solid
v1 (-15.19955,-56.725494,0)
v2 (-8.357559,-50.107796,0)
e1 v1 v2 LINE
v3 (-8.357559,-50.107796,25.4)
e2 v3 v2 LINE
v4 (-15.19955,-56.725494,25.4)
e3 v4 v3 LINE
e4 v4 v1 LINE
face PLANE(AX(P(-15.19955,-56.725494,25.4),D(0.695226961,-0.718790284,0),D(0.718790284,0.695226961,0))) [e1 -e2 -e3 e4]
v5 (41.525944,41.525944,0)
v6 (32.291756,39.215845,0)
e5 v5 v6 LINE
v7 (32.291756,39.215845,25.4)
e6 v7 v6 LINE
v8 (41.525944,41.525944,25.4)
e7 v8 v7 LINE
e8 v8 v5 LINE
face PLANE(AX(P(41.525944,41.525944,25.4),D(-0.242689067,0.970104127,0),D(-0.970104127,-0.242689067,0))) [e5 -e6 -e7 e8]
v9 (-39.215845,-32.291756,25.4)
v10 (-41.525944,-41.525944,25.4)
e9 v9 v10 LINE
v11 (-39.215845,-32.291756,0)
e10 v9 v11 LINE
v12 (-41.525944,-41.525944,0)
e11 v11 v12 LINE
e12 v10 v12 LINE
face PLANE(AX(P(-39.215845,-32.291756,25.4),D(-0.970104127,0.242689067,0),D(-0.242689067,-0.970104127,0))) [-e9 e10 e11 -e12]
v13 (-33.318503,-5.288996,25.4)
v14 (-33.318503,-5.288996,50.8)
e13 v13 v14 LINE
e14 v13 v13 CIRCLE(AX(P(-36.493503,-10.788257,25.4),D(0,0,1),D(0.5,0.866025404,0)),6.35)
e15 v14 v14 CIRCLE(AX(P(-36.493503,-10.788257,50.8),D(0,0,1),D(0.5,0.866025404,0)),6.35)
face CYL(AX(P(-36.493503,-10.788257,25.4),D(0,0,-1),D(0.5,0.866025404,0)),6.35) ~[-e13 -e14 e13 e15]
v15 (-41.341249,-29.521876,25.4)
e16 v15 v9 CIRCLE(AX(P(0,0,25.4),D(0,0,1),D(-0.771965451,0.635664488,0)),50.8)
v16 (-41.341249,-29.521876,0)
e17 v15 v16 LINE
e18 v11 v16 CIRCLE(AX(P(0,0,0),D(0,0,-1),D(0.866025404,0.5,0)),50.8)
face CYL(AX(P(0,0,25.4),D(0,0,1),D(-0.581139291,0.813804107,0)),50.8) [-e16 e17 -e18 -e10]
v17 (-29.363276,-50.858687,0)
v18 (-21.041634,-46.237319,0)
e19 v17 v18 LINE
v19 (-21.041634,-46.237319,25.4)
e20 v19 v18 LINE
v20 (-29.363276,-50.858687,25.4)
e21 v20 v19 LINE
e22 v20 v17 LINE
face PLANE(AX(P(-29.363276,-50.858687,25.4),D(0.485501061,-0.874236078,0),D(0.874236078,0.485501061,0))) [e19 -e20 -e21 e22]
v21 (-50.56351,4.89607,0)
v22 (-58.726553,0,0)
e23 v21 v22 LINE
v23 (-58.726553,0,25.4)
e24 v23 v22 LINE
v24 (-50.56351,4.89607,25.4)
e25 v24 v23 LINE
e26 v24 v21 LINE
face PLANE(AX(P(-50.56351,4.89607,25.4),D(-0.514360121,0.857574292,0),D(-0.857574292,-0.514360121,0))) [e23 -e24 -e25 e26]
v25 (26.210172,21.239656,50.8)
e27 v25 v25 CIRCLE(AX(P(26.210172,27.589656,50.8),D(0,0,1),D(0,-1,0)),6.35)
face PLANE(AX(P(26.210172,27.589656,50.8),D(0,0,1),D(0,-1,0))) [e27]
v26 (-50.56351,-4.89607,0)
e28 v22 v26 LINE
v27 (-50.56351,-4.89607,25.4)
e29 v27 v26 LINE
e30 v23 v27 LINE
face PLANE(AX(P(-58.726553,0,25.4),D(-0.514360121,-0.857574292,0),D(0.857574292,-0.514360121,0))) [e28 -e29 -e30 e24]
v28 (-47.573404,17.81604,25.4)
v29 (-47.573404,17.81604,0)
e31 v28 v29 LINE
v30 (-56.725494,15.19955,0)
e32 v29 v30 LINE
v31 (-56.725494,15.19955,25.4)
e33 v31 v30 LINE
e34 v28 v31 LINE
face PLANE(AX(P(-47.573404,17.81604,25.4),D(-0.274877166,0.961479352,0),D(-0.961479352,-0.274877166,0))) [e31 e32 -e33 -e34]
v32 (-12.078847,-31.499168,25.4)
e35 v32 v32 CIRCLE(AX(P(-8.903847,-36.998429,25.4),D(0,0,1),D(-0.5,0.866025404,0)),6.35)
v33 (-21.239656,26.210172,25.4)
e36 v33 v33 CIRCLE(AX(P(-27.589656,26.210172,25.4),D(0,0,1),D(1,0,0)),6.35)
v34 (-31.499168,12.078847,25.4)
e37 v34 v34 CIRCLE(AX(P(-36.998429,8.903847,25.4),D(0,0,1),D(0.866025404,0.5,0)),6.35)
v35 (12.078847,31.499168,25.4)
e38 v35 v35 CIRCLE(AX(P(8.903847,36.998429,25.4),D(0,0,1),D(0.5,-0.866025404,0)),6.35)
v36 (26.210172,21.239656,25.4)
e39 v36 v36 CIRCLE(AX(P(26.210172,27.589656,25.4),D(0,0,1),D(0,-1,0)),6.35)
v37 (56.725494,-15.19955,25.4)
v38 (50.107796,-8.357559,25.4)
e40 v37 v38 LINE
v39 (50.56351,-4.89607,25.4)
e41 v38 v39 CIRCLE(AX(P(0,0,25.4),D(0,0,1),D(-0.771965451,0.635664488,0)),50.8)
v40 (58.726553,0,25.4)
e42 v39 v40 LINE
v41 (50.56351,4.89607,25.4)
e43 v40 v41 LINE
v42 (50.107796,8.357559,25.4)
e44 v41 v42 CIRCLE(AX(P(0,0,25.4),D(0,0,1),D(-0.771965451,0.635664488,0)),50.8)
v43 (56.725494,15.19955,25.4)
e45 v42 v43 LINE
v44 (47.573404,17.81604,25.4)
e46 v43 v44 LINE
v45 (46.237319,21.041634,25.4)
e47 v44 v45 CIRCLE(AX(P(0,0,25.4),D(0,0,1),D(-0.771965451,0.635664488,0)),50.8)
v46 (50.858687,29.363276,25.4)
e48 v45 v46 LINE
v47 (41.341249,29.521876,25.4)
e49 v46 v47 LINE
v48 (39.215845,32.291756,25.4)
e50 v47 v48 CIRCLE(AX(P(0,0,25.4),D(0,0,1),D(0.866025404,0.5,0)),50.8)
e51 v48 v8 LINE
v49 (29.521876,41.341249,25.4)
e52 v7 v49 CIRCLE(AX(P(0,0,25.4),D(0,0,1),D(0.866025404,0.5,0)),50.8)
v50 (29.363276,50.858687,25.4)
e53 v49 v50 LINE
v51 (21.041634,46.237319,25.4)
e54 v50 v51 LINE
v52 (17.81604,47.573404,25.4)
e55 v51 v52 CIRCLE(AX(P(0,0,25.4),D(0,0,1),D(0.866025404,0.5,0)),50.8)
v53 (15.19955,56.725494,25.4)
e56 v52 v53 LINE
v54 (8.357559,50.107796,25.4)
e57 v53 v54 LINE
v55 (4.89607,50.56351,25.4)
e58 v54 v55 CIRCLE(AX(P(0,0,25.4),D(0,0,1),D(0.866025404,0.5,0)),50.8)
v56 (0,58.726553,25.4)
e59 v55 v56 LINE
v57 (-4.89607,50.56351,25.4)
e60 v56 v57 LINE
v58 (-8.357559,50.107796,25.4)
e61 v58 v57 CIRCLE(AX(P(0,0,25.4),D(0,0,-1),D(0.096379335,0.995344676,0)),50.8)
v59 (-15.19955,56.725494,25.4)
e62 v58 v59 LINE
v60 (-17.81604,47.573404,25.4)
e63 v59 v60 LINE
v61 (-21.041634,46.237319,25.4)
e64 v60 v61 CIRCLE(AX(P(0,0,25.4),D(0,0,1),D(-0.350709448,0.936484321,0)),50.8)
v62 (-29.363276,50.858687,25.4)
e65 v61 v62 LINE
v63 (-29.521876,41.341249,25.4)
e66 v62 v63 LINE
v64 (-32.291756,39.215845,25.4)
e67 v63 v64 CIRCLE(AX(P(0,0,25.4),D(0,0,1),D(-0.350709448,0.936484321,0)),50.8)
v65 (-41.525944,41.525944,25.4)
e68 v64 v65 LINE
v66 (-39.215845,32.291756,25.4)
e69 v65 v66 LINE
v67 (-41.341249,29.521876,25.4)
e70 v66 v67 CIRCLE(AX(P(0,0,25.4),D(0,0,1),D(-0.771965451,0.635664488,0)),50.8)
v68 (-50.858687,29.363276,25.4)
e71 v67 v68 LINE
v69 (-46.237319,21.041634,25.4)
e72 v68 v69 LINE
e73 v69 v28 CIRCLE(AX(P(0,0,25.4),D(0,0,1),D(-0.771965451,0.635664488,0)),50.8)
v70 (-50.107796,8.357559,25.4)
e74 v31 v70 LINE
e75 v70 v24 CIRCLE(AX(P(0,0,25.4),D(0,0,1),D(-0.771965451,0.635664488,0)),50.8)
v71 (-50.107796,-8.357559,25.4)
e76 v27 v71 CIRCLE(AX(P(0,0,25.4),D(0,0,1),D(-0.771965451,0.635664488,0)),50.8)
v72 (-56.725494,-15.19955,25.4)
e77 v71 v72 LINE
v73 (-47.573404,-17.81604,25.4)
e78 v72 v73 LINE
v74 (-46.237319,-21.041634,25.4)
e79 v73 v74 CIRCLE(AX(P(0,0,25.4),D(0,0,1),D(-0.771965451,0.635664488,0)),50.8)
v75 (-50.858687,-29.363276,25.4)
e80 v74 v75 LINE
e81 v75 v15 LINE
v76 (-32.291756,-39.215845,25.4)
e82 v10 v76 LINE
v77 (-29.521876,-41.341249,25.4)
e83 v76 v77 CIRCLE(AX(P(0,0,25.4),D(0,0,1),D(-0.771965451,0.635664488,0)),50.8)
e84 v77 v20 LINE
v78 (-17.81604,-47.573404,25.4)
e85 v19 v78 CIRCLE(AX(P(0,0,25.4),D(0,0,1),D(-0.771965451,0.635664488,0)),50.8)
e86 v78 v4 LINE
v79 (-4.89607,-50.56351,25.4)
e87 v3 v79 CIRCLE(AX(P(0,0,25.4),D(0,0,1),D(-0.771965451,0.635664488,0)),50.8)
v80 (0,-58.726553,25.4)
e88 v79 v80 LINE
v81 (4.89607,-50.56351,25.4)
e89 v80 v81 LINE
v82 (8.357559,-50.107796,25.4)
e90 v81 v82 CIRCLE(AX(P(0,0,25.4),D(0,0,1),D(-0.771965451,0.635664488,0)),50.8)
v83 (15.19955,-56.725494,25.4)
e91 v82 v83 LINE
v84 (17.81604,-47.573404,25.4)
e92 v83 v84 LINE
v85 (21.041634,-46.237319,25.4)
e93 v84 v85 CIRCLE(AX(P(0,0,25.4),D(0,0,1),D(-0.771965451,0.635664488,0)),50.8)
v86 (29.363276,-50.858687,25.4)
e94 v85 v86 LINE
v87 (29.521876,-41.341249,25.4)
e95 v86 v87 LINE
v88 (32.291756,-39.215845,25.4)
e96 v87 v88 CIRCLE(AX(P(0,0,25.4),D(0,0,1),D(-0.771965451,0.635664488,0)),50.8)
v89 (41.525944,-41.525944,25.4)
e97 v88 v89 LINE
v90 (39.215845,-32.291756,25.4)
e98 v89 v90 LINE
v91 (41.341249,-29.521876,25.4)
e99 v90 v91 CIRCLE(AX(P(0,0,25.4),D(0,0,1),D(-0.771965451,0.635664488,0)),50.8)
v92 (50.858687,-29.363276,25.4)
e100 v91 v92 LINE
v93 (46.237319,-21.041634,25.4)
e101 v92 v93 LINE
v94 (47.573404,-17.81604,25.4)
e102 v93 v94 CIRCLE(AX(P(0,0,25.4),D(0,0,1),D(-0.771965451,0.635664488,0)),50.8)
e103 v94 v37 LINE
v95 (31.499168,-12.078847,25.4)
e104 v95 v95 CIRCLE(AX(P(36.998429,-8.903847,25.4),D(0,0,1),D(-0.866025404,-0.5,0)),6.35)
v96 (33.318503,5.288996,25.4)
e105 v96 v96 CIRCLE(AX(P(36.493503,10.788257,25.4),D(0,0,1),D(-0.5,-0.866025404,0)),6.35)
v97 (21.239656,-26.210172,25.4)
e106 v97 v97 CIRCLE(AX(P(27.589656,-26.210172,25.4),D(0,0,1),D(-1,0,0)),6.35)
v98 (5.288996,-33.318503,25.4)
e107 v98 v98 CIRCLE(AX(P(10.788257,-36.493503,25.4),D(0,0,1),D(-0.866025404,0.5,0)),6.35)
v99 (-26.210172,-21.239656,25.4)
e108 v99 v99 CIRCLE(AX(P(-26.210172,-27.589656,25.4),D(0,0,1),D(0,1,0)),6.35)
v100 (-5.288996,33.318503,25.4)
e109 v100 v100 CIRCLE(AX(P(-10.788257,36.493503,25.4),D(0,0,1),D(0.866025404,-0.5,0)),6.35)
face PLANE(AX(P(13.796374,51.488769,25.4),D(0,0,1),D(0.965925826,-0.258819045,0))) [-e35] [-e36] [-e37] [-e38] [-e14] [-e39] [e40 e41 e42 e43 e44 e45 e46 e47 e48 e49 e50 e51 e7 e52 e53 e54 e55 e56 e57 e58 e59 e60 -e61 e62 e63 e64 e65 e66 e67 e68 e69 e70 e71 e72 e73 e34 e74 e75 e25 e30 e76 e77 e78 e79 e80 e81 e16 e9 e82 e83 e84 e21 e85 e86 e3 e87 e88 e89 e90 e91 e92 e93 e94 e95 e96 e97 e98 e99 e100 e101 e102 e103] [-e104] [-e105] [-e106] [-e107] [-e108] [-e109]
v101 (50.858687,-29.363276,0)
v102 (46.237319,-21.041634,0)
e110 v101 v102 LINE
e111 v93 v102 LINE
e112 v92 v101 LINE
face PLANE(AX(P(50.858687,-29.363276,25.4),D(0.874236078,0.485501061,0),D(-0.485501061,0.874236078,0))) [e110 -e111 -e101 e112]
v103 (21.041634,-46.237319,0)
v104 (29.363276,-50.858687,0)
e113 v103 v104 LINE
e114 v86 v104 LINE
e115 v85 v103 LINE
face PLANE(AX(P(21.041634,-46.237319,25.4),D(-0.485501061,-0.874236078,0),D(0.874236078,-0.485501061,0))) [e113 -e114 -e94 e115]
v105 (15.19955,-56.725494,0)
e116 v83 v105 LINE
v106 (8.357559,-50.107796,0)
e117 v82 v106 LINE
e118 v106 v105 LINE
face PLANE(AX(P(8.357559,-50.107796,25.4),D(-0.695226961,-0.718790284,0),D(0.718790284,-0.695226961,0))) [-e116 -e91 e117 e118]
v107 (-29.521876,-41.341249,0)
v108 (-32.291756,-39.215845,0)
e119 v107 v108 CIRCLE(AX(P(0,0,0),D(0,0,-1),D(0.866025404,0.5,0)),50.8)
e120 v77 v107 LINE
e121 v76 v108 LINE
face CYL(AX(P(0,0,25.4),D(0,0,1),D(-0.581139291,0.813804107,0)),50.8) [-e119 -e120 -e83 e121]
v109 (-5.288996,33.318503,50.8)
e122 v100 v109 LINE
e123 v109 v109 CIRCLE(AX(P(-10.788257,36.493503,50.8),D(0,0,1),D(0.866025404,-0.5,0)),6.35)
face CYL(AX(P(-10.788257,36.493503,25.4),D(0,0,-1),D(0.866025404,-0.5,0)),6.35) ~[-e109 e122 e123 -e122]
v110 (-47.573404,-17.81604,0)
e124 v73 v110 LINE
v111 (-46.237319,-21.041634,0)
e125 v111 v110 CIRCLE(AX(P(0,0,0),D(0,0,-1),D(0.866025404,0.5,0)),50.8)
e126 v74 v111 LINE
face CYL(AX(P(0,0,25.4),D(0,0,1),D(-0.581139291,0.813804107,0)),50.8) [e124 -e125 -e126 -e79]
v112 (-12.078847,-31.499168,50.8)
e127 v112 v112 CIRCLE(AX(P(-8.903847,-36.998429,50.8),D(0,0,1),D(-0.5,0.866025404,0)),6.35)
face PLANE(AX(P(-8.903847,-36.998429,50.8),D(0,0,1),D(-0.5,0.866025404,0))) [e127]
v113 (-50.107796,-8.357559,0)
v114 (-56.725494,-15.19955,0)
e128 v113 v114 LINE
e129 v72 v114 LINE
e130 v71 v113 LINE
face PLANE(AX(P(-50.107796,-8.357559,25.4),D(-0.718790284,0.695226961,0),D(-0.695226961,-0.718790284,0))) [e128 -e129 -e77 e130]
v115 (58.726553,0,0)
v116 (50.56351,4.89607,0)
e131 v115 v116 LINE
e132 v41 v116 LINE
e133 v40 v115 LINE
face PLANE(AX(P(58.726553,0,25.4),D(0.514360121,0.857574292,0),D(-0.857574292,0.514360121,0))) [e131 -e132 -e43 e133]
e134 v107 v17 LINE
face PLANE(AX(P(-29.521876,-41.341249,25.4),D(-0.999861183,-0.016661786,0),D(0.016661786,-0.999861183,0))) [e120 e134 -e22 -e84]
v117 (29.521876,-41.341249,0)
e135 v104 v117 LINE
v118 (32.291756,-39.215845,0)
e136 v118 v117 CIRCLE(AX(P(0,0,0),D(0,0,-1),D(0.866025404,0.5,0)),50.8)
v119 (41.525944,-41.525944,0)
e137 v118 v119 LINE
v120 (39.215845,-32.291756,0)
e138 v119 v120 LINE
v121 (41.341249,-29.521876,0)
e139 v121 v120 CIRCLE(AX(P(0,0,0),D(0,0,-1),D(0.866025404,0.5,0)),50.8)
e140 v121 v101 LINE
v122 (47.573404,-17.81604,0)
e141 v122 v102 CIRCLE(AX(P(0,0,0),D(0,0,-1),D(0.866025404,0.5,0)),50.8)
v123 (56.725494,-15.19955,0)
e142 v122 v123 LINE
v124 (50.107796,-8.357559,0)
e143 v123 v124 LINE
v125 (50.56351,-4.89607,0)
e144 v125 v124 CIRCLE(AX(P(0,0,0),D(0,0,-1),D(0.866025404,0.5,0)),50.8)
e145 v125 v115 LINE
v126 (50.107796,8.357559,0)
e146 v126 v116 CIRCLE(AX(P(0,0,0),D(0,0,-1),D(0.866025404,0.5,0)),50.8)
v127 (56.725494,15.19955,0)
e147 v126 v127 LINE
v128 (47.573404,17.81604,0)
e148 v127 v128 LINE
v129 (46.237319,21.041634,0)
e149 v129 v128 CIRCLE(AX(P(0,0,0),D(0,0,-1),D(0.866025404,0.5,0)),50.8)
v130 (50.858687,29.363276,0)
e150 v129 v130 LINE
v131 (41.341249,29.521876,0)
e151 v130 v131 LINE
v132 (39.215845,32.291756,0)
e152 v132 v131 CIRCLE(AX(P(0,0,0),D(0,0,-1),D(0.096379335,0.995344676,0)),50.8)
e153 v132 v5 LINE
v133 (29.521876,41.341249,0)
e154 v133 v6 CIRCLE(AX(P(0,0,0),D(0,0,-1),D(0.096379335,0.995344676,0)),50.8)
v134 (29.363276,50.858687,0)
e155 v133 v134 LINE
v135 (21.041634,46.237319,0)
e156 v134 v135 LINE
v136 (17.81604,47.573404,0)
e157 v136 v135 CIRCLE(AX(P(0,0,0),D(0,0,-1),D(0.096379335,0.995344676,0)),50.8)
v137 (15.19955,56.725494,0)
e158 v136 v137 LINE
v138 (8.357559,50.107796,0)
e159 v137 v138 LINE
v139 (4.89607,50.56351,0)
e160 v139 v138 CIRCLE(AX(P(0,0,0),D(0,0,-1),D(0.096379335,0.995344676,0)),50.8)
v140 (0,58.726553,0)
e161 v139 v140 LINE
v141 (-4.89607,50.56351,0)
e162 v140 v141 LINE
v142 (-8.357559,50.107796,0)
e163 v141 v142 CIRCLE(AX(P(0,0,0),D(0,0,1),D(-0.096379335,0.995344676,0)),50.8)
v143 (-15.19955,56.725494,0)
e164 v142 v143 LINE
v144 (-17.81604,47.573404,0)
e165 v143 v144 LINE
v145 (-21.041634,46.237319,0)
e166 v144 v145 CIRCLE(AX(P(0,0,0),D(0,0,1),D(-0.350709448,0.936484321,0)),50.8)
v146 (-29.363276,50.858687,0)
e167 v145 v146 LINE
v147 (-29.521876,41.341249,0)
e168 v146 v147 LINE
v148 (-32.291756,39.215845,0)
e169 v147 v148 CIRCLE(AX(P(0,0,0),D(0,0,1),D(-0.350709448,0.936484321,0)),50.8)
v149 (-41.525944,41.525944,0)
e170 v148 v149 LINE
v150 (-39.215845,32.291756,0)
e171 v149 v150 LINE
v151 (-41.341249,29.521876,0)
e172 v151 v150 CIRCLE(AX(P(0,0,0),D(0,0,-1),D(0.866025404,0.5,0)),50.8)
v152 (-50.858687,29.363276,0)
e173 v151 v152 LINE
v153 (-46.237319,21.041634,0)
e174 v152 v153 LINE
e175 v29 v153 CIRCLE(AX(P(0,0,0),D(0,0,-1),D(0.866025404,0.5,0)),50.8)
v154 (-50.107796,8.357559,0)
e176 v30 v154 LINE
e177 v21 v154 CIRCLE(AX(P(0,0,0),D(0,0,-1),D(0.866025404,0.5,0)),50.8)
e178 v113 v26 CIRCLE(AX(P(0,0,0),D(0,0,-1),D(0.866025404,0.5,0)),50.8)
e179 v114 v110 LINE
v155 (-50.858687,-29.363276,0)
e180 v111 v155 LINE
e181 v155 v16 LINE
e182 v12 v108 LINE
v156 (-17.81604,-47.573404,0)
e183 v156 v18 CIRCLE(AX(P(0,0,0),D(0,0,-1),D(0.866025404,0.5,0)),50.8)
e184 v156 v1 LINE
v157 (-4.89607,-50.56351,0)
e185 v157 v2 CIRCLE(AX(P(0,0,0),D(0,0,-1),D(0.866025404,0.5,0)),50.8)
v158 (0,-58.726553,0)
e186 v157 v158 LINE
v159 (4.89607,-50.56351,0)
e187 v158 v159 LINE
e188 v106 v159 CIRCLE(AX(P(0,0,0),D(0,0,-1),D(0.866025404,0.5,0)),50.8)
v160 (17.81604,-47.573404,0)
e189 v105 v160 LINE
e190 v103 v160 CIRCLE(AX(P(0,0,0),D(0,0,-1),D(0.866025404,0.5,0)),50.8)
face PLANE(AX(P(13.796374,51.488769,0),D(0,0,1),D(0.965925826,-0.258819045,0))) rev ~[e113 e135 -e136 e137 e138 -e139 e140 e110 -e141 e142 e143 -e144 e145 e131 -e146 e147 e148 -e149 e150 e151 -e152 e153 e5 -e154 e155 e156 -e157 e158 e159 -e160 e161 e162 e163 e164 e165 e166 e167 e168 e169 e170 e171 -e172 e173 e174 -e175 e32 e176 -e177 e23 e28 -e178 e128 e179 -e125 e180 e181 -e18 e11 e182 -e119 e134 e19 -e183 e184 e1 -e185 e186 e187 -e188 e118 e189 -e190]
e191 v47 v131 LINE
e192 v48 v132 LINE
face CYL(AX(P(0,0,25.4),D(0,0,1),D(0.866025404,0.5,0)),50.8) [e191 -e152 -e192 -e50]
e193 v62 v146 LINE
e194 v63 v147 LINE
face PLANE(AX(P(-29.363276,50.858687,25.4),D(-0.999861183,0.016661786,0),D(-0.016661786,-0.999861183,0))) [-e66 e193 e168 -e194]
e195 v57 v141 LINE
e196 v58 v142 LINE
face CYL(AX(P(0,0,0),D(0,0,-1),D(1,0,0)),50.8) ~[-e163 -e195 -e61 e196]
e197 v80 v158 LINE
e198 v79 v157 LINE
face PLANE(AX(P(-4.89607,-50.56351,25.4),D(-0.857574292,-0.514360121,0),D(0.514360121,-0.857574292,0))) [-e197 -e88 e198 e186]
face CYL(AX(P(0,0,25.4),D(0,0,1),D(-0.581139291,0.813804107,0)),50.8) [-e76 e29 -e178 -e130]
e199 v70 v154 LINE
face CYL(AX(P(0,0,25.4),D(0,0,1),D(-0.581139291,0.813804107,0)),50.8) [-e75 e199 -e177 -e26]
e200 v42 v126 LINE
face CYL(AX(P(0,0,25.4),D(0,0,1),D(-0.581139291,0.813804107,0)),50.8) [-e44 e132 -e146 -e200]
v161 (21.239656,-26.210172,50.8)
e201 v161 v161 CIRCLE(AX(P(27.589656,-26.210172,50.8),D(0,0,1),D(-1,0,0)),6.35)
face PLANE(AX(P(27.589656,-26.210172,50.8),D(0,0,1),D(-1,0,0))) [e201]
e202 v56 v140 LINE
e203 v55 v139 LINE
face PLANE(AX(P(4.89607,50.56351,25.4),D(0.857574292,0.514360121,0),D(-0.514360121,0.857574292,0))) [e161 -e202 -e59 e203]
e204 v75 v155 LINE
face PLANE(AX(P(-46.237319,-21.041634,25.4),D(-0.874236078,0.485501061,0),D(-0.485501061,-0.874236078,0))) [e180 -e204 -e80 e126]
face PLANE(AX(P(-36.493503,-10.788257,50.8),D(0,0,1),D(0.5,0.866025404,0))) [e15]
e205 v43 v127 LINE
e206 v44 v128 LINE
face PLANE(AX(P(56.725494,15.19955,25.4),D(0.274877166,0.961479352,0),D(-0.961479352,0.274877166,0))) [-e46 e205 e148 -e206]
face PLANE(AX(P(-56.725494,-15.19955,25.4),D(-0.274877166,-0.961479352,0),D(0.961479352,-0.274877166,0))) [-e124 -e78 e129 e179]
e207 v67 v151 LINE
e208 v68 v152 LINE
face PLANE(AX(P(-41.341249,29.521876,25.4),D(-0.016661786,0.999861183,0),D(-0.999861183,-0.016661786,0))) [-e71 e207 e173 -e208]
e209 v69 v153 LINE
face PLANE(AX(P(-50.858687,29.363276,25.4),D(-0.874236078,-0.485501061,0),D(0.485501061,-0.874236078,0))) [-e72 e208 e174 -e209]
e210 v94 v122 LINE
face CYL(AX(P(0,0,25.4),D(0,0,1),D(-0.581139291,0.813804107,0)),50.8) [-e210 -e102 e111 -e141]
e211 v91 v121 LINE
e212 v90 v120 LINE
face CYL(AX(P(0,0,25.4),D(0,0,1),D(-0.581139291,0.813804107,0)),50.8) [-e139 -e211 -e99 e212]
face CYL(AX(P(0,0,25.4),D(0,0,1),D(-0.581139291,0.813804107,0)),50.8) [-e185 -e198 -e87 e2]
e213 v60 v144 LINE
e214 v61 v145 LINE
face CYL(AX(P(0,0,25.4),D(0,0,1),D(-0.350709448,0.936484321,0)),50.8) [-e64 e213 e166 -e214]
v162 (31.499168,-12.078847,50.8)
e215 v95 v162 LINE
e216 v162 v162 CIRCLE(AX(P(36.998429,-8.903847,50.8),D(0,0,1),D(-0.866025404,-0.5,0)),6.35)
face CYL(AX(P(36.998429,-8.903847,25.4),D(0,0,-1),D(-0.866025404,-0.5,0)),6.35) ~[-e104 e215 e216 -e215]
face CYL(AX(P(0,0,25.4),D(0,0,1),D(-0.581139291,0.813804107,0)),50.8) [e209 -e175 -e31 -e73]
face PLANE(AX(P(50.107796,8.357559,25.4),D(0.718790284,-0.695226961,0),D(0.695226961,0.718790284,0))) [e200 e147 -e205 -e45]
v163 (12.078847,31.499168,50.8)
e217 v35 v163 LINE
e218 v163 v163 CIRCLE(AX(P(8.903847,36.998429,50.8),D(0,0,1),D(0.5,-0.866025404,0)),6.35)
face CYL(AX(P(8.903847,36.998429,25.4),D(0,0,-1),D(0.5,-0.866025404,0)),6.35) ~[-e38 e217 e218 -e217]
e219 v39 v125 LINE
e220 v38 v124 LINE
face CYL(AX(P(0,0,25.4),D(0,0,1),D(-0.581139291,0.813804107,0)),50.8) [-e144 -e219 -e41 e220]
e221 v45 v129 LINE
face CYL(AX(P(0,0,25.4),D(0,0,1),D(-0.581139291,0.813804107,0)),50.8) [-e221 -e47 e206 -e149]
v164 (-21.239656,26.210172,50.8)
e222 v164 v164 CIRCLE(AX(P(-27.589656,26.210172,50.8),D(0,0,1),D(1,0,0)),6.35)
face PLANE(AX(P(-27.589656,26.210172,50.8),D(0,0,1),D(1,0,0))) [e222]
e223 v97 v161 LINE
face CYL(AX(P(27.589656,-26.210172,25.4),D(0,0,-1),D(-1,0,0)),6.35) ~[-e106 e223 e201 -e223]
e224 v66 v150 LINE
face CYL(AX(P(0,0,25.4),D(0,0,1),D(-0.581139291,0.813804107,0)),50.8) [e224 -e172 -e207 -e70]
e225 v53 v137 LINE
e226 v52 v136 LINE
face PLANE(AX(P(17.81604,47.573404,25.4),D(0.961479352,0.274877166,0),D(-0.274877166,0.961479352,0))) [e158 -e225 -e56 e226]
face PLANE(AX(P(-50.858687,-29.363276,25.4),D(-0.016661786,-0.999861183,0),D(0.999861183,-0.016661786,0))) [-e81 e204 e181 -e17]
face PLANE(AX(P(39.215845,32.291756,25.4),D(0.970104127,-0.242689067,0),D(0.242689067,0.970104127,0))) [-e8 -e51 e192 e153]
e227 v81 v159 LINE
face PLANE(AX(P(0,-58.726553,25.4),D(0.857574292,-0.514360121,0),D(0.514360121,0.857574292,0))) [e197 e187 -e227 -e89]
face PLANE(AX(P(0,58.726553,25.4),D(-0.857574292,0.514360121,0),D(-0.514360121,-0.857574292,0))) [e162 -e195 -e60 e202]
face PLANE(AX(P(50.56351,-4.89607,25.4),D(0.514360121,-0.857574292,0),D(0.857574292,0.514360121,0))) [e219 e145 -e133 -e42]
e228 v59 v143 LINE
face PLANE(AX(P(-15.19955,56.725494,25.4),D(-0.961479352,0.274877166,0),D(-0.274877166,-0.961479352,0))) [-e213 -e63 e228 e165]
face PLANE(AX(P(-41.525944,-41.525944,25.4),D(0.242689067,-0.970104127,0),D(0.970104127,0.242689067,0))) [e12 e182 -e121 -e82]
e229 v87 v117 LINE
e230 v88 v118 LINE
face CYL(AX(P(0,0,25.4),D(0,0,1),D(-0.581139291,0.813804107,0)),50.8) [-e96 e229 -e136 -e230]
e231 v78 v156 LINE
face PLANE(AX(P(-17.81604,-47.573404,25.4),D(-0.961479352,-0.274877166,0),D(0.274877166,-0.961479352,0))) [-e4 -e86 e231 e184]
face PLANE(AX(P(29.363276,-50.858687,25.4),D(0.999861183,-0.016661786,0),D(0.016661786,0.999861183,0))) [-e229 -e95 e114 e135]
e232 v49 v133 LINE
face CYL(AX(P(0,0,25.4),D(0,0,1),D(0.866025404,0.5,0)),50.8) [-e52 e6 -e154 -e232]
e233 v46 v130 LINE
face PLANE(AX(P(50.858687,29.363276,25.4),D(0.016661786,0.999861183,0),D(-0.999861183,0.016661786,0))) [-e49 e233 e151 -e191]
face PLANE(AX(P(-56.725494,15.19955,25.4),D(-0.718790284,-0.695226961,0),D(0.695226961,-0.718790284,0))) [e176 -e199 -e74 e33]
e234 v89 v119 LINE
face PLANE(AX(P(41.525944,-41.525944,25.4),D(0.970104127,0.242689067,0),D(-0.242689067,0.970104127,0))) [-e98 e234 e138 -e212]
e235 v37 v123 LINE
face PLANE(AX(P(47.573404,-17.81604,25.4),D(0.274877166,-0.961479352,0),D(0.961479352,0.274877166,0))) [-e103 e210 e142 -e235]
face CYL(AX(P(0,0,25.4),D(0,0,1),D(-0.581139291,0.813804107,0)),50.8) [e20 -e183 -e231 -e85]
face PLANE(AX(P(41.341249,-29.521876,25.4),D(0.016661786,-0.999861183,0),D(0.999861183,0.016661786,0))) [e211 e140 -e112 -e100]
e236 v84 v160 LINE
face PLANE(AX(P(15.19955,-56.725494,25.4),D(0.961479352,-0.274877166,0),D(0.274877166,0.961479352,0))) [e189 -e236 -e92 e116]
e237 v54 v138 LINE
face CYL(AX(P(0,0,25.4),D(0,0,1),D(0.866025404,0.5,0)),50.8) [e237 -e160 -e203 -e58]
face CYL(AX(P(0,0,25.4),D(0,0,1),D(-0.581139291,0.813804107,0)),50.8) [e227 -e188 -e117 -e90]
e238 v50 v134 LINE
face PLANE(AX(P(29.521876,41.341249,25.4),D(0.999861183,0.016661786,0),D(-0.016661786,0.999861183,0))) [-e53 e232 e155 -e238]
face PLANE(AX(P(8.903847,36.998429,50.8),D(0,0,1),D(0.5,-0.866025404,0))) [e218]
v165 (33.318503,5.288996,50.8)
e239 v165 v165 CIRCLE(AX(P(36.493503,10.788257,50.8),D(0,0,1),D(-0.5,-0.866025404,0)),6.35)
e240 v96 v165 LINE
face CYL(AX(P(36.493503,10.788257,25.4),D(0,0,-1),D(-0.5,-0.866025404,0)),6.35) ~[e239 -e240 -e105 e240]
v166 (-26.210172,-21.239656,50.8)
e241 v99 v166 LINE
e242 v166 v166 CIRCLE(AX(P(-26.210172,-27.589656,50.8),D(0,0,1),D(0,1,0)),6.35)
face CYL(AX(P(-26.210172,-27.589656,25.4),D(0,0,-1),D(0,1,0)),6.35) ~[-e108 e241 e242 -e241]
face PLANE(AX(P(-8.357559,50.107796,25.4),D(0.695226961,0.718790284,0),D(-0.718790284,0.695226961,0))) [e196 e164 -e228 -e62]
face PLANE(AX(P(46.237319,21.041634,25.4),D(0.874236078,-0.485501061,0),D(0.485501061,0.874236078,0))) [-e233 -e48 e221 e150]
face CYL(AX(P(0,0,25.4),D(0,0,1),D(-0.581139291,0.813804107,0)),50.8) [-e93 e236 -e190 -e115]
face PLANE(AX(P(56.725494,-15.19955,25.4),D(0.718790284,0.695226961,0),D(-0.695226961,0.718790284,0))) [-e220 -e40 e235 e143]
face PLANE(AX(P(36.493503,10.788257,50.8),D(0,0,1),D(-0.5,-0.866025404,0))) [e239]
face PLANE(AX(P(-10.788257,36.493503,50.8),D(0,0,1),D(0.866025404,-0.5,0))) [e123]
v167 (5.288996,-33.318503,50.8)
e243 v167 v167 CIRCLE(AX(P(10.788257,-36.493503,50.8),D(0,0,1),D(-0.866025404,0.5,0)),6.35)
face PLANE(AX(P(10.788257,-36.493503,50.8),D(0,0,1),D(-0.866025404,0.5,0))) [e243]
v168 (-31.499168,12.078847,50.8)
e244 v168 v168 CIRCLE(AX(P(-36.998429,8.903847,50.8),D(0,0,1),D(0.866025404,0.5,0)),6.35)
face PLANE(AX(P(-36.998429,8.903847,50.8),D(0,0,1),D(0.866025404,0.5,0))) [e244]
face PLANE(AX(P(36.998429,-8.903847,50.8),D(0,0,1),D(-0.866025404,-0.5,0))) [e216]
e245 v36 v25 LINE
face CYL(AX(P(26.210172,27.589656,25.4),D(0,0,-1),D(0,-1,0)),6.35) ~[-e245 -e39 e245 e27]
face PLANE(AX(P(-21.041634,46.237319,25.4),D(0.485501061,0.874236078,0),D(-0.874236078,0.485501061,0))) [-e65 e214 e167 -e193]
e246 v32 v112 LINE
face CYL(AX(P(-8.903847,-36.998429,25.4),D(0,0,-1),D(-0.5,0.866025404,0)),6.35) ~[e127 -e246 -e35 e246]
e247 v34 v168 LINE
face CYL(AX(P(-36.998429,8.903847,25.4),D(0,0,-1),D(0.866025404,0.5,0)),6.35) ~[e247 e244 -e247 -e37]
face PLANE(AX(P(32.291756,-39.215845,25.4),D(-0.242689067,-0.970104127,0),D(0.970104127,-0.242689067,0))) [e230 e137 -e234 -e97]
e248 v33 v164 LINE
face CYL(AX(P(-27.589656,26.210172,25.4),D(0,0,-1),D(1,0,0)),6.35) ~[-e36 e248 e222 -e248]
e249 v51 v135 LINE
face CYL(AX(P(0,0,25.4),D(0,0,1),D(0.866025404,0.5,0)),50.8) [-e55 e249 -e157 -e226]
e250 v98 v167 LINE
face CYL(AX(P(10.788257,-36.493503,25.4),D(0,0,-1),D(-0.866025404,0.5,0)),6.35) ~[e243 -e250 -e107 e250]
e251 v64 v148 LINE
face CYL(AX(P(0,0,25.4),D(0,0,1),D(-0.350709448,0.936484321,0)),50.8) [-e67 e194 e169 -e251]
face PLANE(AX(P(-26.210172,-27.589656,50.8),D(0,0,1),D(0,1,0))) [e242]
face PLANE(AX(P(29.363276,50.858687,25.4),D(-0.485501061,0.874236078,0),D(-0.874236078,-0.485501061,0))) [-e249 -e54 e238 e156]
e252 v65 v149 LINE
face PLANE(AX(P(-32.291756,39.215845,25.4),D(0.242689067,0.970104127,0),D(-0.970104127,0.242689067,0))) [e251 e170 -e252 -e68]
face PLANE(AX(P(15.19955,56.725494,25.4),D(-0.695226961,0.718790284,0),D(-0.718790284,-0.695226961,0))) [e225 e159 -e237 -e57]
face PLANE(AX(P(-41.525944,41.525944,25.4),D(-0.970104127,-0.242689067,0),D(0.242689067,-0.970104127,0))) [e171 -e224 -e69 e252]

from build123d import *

# Parameters (mm, degrees)
F0_R            = 50.8
F1_DEPTH        = 25.4
F2_R            = 6.35
F3_DEPTH        = 25.4
F3_COPIES_COUNT = 12
F5_DEPTH        = 25.4
F5_COPIES_COUNT = 24


# Not quite as in the source:
# - a pattern or mirror of a feature is missing from the dataset's text; its kind, count and spacing are read off the source's solid


with BuildPart() as f1:
    # F0 (on Top) → F1 (new body)
    with BuildSketch(Plane.XY):
        Circle(F0_R)
    extrude(amount=F1_DEPTH)

    # F2 (on face) → F3 (join)
    with BuildSketch(Plane.XY.offset(25.4)):
        with Locations((-27.5896564126, 26.2101721019)):
            Circle(F2_R)
    f3 = extrude(amount=F3_DEPTH)

    # F3_copies: F3 ×12 about axis
    f3_copies_axis = Axis((0, 0, 0), (0, 0, 1))
    for i in range(1, F3_COPIES_COUNT):
        add(f3.rotate(f3_copies_axis, i * 360 / F3_COPIES_COUNT))

    # F4 (on face) → F5 (join)
    with BuildSketch(Plane.XY.offset(25.4)):
        with BuildLine():
            Line((4.8960702354, 50.5635095326), (0, 58.7265528738))
            Line((0, 58.7265528738), (-4.8960702354, 50.5635095326))
            ThreePointArc((-4.8960702354, 50.5635095326), (0, 50.8), (4.8960702354, 50.5635095326))
        make_face()
        with BuildLine():
            Line((4.8960702354, 50.5635095326), (-4.8960702354, 50.5635095326))
            ThreePointArc((-4.8960702354, 50.5635095326), (-34.1461537515, -37.6122344986), (50.8, 0))
            ThreePointArc((50.8, 0), (37.6122344986, 34.1461537515), (4.8960702354, 50.5635095326))
        make_face()
        with BuildLine():
            ThreePointArc((4.8960702354, 50.5635095326), (0, 50.8), (-4.8960702354, 50.5635095326))
            Line((-4.8960702354, 50.5635095326), (4.8960702354, 50.5635095326))
        make_face()
    f5 = extrude(amount=-F5_DEPTH)

    # F5_copies: F5 ×24 about axis
    f5_copies_axis = Axis((0, 0, 0), (0, 0, 1))
    for i in range(1, F5_COPIES_COUNT):
        add(f5.rotate(f5_copies_axis, i * 360 / F5_COPIES_COUNT))


solid = f1.part
